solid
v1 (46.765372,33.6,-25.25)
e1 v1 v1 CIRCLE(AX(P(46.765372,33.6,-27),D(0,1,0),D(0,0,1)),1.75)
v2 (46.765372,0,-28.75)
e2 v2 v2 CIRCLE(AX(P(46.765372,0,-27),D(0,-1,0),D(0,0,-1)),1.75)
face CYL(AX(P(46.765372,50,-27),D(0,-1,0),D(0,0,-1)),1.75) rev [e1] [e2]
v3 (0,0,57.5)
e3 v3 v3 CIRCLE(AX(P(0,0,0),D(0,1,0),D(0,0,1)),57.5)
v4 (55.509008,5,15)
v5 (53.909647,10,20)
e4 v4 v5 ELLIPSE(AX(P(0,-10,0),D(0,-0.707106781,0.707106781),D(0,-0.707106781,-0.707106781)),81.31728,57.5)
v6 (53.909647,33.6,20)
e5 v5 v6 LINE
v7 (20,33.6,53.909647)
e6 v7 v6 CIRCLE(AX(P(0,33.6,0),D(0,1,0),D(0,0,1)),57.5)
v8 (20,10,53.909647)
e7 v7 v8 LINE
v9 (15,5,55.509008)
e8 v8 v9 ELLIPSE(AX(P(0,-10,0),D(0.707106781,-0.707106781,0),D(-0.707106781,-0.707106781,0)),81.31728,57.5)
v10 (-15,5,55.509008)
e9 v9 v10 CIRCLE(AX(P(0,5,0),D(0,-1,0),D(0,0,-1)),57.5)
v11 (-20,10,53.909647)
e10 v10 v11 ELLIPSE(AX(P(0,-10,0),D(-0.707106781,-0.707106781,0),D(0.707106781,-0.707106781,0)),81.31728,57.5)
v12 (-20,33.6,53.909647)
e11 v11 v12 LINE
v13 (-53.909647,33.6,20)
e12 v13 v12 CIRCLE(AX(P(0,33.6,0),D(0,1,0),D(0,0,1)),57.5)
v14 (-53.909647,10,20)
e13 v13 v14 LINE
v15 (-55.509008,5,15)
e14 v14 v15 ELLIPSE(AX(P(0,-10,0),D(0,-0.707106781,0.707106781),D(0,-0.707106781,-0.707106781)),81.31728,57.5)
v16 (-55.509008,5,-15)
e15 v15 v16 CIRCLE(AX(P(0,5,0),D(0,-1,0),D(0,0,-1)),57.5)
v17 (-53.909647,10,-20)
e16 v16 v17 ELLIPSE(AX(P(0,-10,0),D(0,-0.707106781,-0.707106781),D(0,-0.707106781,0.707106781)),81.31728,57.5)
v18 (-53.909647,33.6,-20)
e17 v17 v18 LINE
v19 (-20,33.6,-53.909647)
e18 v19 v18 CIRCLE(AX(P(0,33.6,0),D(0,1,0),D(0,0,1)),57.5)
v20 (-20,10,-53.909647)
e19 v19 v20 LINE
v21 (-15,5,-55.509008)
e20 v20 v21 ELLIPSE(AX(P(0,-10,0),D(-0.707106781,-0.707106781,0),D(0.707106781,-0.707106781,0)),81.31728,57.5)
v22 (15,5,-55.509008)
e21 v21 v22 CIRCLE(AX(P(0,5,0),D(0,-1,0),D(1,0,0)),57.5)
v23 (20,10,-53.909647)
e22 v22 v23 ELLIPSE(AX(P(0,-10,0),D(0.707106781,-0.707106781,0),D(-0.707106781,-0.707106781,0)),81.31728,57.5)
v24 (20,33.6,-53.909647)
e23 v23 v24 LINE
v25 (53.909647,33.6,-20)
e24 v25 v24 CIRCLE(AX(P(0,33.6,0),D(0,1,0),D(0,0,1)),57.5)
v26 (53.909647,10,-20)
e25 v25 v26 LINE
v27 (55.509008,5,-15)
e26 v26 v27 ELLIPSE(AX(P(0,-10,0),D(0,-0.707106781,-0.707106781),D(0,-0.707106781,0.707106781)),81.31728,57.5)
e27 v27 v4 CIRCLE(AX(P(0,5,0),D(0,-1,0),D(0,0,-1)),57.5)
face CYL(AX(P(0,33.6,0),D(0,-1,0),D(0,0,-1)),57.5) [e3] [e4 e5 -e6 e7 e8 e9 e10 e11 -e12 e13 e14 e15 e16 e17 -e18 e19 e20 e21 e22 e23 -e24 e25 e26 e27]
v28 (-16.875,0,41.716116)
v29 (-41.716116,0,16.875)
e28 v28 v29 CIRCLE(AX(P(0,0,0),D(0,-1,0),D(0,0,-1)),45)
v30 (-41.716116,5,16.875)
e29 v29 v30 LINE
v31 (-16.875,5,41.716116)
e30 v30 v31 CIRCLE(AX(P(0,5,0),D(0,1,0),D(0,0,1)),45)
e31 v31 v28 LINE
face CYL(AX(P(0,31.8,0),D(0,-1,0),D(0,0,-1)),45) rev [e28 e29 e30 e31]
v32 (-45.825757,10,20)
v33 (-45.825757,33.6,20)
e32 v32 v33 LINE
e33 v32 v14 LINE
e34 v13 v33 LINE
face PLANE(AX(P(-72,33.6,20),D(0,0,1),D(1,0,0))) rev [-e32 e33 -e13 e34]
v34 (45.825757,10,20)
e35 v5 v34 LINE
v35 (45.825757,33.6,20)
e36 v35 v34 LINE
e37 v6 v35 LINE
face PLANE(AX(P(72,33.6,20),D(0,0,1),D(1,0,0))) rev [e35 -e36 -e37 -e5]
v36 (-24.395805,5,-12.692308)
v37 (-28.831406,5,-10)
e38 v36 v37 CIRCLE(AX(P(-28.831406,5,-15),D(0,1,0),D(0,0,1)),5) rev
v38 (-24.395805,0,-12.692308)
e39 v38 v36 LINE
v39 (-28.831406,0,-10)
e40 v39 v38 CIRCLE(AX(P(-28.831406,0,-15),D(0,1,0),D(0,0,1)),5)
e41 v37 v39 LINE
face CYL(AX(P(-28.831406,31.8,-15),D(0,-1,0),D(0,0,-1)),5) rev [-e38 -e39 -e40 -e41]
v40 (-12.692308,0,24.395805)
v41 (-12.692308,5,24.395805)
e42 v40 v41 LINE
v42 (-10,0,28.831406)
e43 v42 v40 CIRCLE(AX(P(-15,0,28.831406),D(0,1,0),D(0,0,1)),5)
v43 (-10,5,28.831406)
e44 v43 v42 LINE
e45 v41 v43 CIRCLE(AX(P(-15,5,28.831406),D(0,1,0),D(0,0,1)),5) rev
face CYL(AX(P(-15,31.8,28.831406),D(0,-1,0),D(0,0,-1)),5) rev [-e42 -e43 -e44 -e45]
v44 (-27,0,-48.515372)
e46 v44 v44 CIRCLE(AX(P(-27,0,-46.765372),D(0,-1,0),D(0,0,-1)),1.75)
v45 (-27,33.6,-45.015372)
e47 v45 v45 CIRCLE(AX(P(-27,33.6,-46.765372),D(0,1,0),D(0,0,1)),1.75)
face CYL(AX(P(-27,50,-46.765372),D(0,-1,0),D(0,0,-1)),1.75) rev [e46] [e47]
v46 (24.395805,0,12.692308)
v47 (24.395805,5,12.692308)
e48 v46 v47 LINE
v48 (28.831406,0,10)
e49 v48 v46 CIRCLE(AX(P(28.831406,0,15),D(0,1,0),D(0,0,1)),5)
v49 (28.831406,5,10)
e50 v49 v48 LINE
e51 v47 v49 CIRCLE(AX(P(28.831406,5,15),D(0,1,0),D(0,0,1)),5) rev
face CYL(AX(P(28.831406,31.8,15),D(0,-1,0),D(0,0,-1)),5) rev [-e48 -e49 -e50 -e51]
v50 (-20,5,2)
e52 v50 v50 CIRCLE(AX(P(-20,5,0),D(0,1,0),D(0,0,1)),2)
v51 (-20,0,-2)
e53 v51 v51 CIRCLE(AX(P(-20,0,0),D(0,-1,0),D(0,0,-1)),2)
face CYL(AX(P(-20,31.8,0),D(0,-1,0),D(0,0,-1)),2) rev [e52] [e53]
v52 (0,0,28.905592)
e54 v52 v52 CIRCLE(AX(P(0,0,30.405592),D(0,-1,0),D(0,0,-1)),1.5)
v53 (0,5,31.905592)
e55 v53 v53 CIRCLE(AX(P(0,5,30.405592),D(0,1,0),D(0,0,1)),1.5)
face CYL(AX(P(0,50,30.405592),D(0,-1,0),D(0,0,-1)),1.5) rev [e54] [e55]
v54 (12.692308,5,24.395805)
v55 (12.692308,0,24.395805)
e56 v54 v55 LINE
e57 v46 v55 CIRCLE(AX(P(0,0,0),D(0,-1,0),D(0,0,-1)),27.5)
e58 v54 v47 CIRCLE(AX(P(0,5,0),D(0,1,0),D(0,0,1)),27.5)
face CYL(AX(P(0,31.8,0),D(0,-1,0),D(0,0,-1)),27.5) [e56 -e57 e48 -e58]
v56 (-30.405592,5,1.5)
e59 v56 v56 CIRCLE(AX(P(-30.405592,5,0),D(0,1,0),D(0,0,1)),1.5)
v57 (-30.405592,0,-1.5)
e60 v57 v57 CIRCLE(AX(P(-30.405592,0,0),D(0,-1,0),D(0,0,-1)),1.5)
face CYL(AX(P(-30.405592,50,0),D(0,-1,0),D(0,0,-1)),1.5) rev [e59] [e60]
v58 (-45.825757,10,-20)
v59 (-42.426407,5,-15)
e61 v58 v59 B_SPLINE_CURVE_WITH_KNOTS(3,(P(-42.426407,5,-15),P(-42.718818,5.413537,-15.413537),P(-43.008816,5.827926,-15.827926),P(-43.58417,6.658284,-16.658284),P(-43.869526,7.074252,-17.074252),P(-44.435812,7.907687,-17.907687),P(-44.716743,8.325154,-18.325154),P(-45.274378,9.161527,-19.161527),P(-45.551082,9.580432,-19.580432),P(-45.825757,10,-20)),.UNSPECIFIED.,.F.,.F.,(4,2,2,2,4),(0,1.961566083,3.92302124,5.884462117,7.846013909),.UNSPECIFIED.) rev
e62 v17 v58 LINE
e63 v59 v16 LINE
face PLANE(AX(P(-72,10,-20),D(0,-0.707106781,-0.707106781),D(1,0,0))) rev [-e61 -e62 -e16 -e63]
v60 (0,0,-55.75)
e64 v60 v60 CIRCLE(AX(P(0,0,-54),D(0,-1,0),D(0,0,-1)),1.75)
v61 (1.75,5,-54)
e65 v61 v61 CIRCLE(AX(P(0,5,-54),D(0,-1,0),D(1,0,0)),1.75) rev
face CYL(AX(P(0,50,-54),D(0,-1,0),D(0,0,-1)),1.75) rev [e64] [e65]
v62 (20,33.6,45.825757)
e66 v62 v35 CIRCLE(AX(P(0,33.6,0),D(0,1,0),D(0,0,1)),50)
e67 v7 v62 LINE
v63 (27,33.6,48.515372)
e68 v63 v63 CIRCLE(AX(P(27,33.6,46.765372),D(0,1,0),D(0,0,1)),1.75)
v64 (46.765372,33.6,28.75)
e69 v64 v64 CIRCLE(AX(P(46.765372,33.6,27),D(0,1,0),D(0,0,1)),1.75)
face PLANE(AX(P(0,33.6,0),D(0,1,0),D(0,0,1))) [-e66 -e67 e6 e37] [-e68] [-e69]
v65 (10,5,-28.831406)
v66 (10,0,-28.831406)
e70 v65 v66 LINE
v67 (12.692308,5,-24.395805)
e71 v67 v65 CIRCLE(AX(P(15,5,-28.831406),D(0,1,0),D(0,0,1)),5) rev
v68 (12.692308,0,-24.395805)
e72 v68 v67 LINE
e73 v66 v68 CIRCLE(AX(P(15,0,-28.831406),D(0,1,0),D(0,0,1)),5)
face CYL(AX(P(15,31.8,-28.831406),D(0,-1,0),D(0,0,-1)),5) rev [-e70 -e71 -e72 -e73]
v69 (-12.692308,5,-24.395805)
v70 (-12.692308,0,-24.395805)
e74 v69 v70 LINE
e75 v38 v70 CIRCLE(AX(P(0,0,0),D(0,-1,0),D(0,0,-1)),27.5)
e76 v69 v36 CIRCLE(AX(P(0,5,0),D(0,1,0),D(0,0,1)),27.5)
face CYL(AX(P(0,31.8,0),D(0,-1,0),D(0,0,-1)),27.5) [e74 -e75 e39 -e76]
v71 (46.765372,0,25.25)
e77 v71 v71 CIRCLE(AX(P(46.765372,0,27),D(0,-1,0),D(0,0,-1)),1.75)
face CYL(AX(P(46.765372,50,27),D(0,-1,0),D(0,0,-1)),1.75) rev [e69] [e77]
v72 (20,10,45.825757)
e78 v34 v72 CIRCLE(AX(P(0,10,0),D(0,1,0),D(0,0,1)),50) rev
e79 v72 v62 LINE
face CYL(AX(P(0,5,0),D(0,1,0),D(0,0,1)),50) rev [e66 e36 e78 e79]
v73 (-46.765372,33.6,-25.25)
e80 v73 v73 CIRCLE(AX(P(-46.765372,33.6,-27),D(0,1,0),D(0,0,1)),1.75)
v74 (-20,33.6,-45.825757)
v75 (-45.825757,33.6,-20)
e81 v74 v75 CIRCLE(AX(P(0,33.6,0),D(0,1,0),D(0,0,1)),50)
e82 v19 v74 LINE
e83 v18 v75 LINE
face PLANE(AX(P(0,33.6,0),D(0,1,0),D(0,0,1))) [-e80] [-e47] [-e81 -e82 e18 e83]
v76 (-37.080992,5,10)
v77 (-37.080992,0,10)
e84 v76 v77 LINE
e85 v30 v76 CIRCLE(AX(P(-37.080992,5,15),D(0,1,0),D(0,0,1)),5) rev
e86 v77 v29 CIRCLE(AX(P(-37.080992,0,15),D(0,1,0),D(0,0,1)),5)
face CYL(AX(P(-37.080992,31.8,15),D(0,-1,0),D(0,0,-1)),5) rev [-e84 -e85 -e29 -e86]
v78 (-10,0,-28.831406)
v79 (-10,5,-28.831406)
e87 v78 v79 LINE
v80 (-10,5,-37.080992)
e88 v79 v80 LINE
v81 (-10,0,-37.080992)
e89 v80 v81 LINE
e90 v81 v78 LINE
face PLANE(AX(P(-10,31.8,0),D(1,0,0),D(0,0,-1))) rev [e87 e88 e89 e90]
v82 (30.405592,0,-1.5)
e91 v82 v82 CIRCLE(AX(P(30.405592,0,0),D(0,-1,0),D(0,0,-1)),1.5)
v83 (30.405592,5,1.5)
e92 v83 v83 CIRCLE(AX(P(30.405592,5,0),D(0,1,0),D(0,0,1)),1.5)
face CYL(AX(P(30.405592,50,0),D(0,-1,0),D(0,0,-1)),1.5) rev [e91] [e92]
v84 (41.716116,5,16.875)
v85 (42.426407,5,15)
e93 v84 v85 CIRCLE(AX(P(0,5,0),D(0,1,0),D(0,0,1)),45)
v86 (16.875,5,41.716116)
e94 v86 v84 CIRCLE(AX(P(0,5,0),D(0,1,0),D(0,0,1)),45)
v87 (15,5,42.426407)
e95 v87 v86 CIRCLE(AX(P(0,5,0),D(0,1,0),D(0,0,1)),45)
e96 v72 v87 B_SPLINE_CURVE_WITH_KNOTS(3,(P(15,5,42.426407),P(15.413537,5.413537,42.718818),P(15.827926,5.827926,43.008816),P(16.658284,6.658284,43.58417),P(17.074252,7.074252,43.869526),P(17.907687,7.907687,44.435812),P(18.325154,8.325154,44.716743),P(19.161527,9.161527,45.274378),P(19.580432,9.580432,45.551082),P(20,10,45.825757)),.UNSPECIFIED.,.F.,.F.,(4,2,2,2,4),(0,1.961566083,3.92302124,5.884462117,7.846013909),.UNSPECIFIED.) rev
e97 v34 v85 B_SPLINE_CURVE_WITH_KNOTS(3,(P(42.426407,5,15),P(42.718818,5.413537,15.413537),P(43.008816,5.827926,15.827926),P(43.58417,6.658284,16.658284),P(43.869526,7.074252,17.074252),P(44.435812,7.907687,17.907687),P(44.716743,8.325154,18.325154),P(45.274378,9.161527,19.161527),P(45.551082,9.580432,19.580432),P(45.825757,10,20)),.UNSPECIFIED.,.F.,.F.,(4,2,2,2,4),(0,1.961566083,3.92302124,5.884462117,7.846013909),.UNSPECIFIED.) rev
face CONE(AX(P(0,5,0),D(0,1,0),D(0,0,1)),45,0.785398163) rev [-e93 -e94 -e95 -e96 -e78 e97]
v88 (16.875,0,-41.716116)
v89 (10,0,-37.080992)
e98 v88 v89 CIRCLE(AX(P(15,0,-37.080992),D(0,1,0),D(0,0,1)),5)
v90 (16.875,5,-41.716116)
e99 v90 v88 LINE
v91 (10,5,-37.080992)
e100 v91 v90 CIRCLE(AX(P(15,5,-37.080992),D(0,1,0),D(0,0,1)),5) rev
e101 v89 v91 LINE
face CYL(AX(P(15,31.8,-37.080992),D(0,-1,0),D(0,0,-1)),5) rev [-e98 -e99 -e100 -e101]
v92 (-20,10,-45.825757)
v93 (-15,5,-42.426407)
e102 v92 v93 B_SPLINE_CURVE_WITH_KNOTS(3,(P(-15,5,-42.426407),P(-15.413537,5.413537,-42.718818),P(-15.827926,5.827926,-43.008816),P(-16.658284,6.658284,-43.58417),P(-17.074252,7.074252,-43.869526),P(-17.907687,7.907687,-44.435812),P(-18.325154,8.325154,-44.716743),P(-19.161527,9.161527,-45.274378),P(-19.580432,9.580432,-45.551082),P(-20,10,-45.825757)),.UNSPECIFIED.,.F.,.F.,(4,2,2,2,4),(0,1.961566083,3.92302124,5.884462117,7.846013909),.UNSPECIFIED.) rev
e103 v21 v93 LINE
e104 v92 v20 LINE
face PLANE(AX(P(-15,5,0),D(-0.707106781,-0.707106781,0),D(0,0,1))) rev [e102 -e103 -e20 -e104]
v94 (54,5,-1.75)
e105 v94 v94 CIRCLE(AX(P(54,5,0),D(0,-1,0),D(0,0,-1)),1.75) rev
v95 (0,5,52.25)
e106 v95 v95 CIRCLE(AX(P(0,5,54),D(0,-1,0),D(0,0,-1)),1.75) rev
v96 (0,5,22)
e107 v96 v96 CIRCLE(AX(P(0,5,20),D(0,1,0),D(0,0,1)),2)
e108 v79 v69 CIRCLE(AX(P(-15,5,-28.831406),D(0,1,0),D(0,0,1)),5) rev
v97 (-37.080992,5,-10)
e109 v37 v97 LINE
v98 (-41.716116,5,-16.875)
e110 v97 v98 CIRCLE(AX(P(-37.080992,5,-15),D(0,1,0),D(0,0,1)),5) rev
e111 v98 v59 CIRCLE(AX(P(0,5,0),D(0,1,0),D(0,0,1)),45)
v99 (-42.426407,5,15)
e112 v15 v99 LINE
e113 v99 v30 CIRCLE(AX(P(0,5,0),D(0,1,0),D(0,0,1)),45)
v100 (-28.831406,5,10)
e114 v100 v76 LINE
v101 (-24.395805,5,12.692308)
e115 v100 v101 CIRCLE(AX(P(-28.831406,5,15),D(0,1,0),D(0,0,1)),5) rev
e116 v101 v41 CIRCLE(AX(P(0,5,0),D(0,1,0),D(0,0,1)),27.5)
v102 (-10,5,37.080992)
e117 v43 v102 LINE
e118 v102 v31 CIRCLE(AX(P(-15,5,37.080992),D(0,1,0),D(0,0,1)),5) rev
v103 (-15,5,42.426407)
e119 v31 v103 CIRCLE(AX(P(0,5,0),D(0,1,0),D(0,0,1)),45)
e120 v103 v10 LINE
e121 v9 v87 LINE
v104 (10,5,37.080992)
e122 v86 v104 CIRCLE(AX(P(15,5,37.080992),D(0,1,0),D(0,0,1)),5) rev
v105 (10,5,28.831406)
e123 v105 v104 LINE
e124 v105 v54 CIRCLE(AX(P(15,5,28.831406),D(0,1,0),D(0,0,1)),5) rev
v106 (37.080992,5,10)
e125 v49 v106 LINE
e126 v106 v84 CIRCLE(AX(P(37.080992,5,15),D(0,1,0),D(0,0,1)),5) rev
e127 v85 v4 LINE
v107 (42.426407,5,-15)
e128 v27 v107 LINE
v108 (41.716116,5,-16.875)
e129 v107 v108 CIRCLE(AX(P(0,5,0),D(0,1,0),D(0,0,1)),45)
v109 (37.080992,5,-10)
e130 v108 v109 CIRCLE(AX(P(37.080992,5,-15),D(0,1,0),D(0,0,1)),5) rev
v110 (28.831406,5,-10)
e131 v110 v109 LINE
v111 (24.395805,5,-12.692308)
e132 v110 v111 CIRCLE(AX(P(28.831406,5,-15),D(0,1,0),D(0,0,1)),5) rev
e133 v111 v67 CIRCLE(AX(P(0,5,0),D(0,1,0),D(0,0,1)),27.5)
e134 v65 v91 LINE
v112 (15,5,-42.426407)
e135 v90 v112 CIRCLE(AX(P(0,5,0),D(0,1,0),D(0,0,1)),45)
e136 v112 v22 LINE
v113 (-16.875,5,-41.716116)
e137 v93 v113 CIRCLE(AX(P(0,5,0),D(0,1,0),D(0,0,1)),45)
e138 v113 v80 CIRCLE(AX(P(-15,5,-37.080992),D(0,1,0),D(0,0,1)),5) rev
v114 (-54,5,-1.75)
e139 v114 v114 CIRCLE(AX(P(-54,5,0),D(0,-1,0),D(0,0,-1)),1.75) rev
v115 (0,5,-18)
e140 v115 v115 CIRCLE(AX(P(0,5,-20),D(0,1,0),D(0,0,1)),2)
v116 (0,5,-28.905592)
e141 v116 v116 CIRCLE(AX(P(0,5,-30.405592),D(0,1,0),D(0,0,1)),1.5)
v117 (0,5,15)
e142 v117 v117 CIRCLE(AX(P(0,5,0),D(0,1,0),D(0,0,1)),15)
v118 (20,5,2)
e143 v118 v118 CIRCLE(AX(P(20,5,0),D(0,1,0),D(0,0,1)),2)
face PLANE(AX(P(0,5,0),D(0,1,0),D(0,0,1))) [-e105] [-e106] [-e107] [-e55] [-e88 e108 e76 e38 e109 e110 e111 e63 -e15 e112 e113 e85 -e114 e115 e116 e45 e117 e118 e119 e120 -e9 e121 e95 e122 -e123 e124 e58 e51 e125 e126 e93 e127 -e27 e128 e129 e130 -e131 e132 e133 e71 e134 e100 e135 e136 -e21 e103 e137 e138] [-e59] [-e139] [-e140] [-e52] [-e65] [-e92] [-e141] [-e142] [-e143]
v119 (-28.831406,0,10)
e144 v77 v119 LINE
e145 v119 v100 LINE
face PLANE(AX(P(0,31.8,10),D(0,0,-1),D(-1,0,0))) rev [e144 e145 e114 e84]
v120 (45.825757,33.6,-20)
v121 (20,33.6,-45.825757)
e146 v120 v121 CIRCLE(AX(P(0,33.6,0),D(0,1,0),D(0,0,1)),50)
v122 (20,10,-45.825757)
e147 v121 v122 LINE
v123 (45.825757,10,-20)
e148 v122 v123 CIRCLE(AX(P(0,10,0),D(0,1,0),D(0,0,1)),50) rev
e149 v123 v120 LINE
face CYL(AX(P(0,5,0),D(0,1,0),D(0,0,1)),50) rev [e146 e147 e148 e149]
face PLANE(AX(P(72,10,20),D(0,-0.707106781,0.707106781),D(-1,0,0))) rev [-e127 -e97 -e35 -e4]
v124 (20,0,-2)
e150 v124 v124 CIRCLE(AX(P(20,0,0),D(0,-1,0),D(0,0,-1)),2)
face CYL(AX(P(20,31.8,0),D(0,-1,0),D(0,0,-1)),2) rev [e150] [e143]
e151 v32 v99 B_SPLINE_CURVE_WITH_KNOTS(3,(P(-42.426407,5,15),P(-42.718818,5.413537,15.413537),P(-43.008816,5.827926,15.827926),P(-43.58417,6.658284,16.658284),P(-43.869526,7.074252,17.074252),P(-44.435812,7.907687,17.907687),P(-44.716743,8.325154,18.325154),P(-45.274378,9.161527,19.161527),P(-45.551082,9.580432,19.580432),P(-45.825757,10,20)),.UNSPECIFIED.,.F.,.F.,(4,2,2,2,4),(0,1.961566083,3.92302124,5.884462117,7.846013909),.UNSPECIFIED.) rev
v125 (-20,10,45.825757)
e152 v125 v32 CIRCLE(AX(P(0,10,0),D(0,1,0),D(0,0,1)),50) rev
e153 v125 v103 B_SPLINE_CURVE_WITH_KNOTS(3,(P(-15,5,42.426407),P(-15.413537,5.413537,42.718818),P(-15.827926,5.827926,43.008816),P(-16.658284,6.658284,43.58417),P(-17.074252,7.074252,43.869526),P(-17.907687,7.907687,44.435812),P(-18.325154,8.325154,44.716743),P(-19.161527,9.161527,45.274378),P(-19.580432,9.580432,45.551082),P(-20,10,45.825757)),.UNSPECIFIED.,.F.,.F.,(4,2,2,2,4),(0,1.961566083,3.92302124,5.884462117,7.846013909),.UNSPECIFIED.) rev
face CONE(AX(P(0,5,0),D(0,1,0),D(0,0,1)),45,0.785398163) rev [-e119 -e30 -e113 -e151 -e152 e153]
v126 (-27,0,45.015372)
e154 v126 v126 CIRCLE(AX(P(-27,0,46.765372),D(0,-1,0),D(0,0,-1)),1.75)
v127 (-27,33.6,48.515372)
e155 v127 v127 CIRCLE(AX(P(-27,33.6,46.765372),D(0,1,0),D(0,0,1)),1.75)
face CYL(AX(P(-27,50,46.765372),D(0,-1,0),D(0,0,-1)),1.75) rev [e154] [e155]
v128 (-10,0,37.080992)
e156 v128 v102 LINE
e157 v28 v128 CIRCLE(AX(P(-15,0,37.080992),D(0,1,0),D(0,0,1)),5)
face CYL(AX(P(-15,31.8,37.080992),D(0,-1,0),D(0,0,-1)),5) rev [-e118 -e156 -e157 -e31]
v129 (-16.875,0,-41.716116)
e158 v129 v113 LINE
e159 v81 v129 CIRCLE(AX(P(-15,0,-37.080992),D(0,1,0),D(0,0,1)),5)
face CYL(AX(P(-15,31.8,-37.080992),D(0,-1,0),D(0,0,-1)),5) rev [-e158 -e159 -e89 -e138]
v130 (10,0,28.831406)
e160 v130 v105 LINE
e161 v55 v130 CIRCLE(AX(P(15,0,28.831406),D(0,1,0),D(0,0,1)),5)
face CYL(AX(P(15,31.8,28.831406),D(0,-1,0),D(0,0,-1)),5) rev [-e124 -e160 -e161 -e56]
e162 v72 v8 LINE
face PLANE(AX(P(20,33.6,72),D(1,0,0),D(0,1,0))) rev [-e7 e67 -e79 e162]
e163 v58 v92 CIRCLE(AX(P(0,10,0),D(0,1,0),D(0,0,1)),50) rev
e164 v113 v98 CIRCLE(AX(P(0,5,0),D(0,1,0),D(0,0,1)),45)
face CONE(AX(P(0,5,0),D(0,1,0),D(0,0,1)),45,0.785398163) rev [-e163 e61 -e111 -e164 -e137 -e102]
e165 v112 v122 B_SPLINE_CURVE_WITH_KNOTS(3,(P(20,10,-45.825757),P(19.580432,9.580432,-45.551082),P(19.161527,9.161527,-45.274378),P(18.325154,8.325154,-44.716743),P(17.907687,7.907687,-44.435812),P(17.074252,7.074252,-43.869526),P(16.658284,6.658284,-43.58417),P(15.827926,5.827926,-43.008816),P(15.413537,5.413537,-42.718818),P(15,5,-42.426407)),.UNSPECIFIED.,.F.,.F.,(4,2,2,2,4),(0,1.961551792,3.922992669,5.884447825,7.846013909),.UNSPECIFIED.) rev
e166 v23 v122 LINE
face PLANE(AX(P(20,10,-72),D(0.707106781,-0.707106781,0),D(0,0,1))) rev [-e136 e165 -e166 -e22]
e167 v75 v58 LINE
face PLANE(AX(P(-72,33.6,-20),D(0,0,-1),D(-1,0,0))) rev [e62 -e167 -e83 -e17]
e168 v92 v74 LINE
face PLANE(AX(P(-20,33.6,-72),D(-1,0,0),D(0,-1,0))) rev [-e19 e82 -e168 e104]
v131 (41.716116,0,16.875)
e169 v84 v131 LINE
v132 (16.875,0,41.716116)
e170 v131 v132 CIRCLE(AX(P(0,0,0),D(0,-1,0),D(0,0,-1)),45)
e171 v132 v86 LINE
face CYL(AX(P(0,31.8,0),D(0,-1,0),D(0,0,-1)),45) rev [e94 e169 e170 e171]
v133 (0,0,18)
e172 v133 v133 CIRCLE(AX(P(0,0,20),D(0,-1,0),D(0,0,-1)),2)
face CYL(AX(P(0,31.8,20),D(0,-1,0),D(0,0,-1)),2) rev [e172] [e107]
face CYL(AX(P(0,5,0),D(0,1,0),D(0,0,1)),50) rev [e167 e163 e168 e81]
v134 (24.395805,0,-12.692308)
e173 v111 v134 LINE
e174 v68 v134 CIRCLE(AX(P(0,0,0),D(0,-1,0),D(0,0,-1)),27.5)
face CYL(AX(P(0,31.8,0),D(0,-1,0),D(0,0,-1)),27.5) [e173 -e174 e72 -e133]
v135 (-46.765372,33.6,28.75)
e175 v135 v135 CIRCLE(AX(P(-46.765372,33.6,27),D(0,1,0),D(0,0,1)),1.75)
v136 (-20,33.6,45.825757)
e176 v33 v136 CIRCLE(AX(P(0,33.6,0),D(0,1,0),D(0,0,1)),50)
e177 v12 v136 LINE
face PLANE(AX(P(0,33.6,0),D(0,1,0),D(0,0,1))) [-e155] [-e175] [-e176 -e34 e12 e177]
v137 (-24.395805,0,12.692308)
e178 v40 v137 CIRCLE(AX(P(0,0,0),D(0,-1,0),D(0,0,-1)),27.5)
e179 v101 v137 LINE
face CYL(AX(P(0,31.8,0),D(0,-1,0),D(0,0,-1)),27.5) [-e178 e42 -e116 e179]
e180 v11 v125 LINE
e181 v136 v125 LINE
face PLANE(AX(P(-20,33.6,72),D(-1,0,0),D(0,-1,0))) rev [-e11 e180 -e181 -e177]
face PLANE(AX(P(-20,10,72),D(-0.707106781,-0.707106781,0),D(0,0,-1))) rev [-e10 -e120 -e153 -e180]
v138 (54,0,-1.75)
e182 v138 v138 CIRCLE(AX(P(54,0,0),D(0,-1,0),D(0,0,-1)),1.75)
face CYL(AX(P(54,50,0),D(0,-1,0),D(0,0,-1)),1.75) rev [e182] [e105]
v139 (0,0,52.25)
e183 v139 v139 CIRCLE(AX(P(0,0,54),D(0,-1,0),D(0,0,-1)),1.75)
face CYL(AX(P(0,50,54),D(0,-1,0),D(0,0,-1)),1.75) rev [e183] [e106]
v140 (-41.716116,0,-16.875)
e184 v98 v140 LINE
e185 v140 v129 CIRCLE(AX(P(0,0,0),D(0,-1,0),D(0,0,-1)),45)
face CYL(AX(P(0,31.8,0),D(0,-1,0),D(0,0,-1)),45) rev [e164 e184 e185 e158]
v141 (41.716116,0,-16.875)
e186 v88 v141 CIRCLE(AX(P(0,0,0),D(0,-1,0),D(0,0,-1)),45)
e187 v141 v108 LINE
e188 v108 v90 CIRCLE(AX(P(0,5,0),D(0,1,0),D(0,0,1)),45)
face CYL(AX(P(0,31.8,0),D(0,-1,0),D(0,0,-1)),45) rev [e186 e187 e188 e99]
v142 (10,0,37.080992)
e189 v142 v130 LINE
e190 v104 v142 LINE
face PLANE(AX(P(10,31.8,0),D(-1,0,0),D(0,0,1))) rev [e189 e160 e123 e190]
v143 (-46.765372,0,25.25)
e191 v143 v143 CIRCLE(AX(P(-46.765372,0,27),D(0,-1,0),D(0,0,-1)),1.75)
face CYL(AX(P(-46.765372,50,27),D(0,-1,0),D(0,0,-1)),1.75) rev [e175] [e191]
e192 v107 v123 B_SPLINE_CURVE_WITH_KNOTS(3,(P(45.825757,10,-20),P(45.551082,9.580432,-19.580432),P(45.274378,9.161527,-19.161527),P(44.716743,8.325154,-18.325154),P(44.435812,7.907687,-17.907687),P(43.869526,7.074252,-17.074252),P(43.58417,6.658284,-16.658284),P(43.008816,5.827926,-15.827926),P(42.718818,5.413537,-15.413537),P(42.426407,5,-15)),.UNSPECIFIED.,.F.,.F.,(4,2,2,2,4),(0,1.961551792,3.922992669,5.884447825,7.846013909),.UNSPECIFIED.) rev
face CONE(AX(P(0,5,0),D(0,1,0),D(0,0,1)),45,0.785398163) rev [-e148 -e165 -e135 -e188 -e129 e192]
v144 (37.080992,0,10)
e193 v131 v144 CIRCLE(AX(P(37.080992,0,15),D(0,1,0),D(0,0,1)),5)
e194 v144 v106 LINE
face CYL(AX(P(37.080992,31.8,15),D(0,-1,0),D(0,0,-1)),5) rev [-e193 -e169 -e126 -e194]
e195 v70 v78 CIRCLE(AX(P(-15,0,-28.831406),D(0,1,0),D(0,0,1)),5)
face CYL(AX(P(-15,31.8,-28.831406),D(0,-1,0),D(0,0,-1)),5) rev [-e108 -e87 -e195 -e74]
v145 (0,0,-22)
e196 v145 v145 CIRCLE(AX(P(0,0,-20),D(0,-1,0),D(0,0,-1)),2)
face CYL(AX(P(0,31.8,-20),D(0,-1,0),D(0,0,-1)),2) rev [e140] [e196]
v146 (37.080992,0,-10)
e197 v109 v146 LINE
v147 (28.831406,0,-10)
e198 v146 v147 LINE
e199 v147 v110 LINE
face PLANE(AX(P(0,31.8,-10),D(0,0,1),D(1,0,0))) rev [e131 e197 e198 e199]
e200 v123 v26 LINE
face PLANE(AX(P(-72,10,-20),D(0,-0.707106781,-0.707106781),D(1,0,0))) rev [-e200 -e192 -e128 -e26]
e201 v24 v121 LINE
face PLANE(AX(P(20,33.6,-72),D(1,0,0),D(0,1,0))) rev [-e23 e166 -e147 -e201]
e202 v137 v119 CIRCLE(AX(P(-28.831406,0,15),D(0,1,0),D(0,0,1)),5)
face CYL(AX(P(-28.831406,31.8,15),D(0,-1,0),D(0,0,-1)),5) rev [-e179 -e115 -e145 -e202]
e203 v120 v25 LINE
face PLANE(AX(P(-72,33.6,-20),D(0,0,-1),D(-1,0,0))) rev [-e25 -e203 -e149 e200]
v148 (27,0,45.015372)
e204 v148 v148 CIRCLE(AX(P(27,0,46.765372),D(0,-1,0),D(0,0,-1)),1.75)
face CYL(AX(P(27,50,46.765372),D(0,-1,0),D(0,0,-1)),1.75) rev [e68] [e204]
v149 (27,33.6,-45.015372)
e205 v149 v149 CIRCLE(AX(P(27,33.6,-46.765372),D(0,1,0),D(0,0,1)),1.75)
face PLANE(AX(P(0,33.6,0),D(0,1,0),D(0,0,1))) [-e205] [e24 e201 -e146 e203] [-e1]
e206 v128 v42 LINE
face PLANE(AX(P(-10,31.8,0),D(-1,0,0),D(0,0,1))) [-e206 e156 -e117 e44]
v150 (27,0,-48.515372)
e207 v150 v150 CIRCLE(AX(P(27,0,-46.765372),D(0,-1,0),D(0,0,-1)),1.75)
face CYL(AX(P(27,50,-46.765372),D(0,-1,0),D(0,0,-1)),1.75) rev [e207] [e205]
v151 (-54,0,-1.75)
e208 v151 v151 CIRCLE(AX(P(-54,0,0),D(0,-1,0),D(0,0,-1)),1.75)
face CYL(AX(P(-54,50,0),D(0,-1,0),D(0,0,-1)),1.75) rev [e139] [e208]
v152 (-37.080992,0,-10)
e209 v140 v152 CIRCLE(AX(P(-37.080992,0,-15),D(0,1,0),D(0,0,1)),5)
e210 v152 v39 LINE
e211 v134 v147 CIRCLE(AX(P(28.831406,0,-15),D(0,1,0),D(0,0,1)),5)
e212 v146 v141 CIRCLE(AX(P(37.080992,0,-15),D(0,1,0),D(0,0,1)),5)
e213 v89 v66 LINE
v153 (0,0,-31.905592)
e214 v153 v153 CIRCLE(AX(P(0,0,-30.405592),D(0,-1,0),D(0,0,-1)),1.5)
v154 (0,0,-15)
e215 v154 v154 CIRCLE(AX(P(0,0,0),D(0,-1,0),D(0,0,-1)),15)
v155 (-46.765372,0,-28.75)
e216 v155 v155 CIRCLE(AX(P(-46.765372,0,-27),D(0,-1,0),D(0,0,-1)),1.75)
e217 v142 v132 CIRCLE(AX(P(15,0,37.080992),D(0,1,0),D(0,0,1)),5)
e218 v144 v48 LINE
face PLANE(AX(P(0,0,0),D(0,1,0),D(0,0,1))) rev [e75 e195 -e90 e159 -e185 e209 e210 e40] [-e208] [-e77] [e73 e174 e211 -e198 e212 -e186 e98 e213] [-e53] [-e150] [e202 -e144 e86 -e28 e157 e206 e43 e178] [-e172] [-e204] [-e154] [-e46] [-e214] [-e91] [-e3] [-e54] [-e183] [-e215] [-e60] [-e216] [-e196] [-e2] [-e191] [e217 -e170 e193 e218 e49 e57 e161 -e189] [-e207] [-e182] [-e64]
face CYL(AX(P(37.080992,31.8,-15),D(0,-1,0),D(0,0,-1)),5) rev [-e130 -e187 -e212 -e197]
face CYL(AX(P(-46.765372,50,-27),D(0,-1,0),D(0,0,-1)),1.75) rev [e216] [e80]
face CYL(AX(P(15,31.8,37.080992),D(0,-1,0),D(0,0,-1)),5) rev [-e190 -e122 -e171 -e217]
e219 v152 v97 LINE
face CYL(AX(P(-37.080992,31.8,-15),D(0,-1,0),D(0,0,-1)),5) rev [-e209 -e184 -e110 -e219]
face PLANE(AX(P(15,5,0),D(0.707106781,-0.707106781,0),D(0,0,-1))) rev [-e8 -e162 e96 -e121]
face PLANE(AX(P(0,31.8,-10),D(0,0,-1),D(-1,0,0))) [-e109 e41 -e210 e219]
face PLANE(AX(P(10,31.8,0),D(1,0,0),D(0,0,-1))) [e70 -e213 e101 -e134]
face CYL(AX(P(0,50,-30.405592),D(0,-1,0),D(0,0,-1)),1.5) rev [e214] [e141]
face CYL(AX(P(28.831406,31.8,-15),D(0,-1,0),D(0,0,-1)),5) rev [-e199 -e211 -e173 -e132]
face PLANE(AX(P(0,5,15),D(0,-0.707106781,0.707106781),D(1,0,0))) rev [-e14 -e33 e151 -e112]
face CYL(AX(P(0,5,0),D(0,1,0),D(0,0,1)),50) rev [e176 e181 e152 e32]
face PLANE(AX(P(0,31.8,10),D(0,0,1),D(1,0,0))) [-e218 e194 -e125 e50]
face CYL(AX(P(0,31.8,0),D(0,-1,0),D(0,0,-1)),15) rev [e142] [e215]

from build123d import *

# Parameters (mm, degrees)
SKETCH1_R           = 57.5
BOSS_EXTRUDE1_DEPTH = 33.6
SKETCH2_R           = 50
CUT_EXTRUDE1_DEPTH  = 28.6
SKETCH3_R           = 2
SKETCH3_R_2         = 15
CUT_EXTRUDE2_DEPTH  = 31.8
SKETCH4_R           = 1.75
SKETCH4_R_2         = 1.5
CUT_EXTRUDE3_DEPTH  = 50
SKETCH9_W           = 40
SKETCH9_H           = 28.6
CUT_EXTRUDE4_DEPTH  = 72
CIRPATTERN1_COUNT   = 4
FILLET2_R           = 5
CHAMFER1_SIZE       = 5


with BuildPart() as part:
    # Sketch1 → Boss-Extrude1 (new body)
    with BuildSketch(Plane(origin=(0, 0, 0), x_dir=(1, 0, 0), z_dir=(0, 1, 0))):
        with Locations(Location((0, 0, 0), (0, 0, 270))):
            Circle(SKETCH1_R)
    extrude(amount=BOSS_EXTRUDE1_DEPTH)

    # Sketch2 → Cut-Extrude1 (cut)
    with BuildSketch(Plane(origin=(0, 33.6, 0), x_dir=(1, 0, 0), z_dir=(0, 1, 0))):
        with Locations(Location((0, 0, 0), (0, 0, 270))):
            Circle(SKETCH2_R)
    extrude(amount=-CUT_EXTRUDE1_DEPTH, mode=Mode.SUBTRACT)

    # Sketch3 → Cut-Extrude2 (cut)
    with BuildSketch(Plane.XZ):
        with BuildLine():
            Line((-10, 25.617376915), (-10, 43.874821937))
            ThreePointArc((-10, 43.874821937), (-31.819805153, 31.819805153), (-43.874821937, 10))
            Line((-43.874821937, 10), (-25.617376915, 10))
            ThreePointArc((-25.617376915, 10), (-19.445436483, 19.445436483), (-10, 25.617376915))
        make_face()
        with BuildLine():
            Line((25.617376915, 10), (43.874821937, 10))
            ThreePointArc((43.874821937, 10), (31.819805153, 31.819805153), (10, 43.874821937))
            Line((10, 43.874821937), (10, 25.617376915))
            ThreePointArc((10, 25.617376915), (19.445436483, 19.445436483), (25.617376915, 10))
        make_face()
        with BuildLine():
            ThreePointArc((10, -43.874821937), (31.819805153, -31.819805153), (43.874821937, -10))
            Line((43.874821937, -10), (25.617376915, -10))
            ThreePointArc((25.617376915, -10), (19.445436483, -19.445436483), (10, -25.617376915))
            Line((10, -25.617376915), (10, -43.874821937))
        make_face()
        with BuildLine():
            ThreePointArc((-43.874821937, -10), (-31.819805153, -31.819805153), (-10, -43.874821937))
            Line((-10, -43.874821937), (-10, -25.617376915))
            ThreePointArc((-10, -25.617376915), (-19.445436483, -19.445436483), (-25.617376915, -10))
            Line((-25.617376915, -10), (-43.874821937, -10))
        make_face()
        with Locations(Location((-20, 0, 0), (0, 0, 270))):
            Circle(SKETCH3_R)
        with Locations(Location((0, 0, 0), (0, 0, 270))):
            Circle(SKETCH3_R_2)
        with Locations(Location((0, 20, 0), (0, 0, 270))):
            Circle(SKETCH3_R)
        with Locations(Location((20, 0, 0), (0, 0, 270))):
            Circle(SKETCH3_R)
        with Locations(Location((0, -20, 0), (0, 0, 270))):
            Circle(SKETCH3_R)
    extrude(amount=-CUT_EXTRUDE2_DEPTH, mode=Mode.SUBTRACT)

    # Sketch4 → Cut-Extrude3 (cut)
    with BuildSketch(Plane.XZ):
        with Locations(Location((0, 54, 0), (0, 0, 270))):
            Circle(SKETCH4_R)
        with Locations(Location((27, 46.765371804, 0), (0, 0, 270))):
            Circle(SKETCH4_R)
        with Locations(Location((46.765371804, 27, 0), (0, 0, 270))):
            Circle(SKETCH4_R)
        with Locations(Location((54, 0, 0), (0, 0, 270))):
            Circle(SKETCH4_R)
        with Locations(Location((46.765371804, -27, 0), (0, 0, 270))):
            Circle(SKETCH4_R)
        with Locations(Location((27, -46.765371804, 0), (0, 0, 270))):
            Circle(SKETCH4_R)
        with Locations(Location((0, -54, 0), (0, 0, 270))):
            Circle(SKETCH4_R)
        with Locations(Location((-27, -46.765371804, 0), (0, 0, 270))):
            Circle(SKETCH4_R)
        with Locations(Location((-46.765371804, -27, 0), (0, 0, 270))):
            Circle(SKETCH4_R)
        with Locations(Location((-54, 0, 0), (0, 0, 270))):
            Circle(SKETCH4_R)
        with Locations(Location((-46.765371804, 27, 0), (0, 0, 270))):
            Circle(SKETCH4_R)
        with Locations(Location((-27, 46.765371804, 0), (0, 0, 270))):
            Circle(SKETCH4_R)
        with Locations(Location((0, 30.405591591, 0), (0, 0, 270))):
            Circle(SKETCH4_R_2)
        with Locations(Location((30.405591591, 0, 0), (0, 0, 270))):
            Circle(SKETCH4_R_2)
        with Locations(Location((0, -30.405591591, 0), (0, 0, 270))):
            Circle(SKETCH4_R_2)
        with Locations(Location((-30.405591591, 0, 0), (0, 0, 270))):
            Circle(SKETCH4_R_2)
    extrude(amount=-CUT_EXTRUDE3_DEPTH, mode=Mode.SUBTRACT)

    # Sketch9 → Cut-Extrude4 (cut)
    with BuildSketch(Plane.XY):
        with Locations((0, 19.3)):
            Rectangle(SKETCH9_W, SKETCH9_H)
    cut_extrude4 = extrude(amount=-CUT_EXTRUDE4_DEPTH, mode=Mode.SUBTRACT)

    # CirPattern1: Cut-Extrude4 ×4 about axis
    cirpattern1_axis = Axis((0, 0, 0), (0, 1, 0))
    for i in range(1, CIRPATTERN1_COUNT):
        add(cut_extrude4.rotate(cirpattern1_axis, i * 360 / CIRPATTERN1_COUNT), mode=Mode.SUBTRACT)

    # Fillet2
    fillet2_edges = [part.edges().sort_by_distance(p)[0] for p in [
        (43.874821937, 2.5, 10),
        (25.617376915, 2.5, 10),
        (10, 2.5, 25.617376915),
        (10, 2.5, 43.874821937),
        (10, 2.5, -43.874821937),
        (10, 2.5, -25.617376915),
        (25.617376915, 2.5, -10),
        (43.874821937, 2.5, -10),
        (-43.874821937, 2.5, -10),
        (-25.617376915, 2.5, -10),
        (-10, 2.5, -25.617376915),
        (-10, 2.5, -43.874821937),
        (-10, 2.5, 43.874821937),
        (-10, 2.5, 25.617376915),
        (-25.617376915, 2.5, 10),
        (-43.874821937, 2.5, 10),
    ]]
    fillet(fillet2_edges, radius=FILLET2_R)

    # Chamfer1
    chamfer1_edges = [part.edges().sort_by_distance(p)[0] for p in [
        (-35.355339059, 5, -35.355339059),
        (-20, 5, -49.867701791),
        (20, 5, -49.867701791),
        (-35.355339059, 5, 35.355339059),
        (35.355339059, 5, 35.355339059),
        (35.355339059, 5, -35.355339059),
        (-49.867701791, 5, 20),
        (20, 5, 49.867701791),
        (49.867701791, 5, -20),
        (49.867701791, 5, 20),
        (-20, 5, 49.867701791),
        (-49.867701791, 5, -20),
    ]]
    chamfer(chamfer1_edges, length=CHAMFER1_SIZE - 0.0001)  # a hair under: the kernel refuses the full size


solid = part.part
